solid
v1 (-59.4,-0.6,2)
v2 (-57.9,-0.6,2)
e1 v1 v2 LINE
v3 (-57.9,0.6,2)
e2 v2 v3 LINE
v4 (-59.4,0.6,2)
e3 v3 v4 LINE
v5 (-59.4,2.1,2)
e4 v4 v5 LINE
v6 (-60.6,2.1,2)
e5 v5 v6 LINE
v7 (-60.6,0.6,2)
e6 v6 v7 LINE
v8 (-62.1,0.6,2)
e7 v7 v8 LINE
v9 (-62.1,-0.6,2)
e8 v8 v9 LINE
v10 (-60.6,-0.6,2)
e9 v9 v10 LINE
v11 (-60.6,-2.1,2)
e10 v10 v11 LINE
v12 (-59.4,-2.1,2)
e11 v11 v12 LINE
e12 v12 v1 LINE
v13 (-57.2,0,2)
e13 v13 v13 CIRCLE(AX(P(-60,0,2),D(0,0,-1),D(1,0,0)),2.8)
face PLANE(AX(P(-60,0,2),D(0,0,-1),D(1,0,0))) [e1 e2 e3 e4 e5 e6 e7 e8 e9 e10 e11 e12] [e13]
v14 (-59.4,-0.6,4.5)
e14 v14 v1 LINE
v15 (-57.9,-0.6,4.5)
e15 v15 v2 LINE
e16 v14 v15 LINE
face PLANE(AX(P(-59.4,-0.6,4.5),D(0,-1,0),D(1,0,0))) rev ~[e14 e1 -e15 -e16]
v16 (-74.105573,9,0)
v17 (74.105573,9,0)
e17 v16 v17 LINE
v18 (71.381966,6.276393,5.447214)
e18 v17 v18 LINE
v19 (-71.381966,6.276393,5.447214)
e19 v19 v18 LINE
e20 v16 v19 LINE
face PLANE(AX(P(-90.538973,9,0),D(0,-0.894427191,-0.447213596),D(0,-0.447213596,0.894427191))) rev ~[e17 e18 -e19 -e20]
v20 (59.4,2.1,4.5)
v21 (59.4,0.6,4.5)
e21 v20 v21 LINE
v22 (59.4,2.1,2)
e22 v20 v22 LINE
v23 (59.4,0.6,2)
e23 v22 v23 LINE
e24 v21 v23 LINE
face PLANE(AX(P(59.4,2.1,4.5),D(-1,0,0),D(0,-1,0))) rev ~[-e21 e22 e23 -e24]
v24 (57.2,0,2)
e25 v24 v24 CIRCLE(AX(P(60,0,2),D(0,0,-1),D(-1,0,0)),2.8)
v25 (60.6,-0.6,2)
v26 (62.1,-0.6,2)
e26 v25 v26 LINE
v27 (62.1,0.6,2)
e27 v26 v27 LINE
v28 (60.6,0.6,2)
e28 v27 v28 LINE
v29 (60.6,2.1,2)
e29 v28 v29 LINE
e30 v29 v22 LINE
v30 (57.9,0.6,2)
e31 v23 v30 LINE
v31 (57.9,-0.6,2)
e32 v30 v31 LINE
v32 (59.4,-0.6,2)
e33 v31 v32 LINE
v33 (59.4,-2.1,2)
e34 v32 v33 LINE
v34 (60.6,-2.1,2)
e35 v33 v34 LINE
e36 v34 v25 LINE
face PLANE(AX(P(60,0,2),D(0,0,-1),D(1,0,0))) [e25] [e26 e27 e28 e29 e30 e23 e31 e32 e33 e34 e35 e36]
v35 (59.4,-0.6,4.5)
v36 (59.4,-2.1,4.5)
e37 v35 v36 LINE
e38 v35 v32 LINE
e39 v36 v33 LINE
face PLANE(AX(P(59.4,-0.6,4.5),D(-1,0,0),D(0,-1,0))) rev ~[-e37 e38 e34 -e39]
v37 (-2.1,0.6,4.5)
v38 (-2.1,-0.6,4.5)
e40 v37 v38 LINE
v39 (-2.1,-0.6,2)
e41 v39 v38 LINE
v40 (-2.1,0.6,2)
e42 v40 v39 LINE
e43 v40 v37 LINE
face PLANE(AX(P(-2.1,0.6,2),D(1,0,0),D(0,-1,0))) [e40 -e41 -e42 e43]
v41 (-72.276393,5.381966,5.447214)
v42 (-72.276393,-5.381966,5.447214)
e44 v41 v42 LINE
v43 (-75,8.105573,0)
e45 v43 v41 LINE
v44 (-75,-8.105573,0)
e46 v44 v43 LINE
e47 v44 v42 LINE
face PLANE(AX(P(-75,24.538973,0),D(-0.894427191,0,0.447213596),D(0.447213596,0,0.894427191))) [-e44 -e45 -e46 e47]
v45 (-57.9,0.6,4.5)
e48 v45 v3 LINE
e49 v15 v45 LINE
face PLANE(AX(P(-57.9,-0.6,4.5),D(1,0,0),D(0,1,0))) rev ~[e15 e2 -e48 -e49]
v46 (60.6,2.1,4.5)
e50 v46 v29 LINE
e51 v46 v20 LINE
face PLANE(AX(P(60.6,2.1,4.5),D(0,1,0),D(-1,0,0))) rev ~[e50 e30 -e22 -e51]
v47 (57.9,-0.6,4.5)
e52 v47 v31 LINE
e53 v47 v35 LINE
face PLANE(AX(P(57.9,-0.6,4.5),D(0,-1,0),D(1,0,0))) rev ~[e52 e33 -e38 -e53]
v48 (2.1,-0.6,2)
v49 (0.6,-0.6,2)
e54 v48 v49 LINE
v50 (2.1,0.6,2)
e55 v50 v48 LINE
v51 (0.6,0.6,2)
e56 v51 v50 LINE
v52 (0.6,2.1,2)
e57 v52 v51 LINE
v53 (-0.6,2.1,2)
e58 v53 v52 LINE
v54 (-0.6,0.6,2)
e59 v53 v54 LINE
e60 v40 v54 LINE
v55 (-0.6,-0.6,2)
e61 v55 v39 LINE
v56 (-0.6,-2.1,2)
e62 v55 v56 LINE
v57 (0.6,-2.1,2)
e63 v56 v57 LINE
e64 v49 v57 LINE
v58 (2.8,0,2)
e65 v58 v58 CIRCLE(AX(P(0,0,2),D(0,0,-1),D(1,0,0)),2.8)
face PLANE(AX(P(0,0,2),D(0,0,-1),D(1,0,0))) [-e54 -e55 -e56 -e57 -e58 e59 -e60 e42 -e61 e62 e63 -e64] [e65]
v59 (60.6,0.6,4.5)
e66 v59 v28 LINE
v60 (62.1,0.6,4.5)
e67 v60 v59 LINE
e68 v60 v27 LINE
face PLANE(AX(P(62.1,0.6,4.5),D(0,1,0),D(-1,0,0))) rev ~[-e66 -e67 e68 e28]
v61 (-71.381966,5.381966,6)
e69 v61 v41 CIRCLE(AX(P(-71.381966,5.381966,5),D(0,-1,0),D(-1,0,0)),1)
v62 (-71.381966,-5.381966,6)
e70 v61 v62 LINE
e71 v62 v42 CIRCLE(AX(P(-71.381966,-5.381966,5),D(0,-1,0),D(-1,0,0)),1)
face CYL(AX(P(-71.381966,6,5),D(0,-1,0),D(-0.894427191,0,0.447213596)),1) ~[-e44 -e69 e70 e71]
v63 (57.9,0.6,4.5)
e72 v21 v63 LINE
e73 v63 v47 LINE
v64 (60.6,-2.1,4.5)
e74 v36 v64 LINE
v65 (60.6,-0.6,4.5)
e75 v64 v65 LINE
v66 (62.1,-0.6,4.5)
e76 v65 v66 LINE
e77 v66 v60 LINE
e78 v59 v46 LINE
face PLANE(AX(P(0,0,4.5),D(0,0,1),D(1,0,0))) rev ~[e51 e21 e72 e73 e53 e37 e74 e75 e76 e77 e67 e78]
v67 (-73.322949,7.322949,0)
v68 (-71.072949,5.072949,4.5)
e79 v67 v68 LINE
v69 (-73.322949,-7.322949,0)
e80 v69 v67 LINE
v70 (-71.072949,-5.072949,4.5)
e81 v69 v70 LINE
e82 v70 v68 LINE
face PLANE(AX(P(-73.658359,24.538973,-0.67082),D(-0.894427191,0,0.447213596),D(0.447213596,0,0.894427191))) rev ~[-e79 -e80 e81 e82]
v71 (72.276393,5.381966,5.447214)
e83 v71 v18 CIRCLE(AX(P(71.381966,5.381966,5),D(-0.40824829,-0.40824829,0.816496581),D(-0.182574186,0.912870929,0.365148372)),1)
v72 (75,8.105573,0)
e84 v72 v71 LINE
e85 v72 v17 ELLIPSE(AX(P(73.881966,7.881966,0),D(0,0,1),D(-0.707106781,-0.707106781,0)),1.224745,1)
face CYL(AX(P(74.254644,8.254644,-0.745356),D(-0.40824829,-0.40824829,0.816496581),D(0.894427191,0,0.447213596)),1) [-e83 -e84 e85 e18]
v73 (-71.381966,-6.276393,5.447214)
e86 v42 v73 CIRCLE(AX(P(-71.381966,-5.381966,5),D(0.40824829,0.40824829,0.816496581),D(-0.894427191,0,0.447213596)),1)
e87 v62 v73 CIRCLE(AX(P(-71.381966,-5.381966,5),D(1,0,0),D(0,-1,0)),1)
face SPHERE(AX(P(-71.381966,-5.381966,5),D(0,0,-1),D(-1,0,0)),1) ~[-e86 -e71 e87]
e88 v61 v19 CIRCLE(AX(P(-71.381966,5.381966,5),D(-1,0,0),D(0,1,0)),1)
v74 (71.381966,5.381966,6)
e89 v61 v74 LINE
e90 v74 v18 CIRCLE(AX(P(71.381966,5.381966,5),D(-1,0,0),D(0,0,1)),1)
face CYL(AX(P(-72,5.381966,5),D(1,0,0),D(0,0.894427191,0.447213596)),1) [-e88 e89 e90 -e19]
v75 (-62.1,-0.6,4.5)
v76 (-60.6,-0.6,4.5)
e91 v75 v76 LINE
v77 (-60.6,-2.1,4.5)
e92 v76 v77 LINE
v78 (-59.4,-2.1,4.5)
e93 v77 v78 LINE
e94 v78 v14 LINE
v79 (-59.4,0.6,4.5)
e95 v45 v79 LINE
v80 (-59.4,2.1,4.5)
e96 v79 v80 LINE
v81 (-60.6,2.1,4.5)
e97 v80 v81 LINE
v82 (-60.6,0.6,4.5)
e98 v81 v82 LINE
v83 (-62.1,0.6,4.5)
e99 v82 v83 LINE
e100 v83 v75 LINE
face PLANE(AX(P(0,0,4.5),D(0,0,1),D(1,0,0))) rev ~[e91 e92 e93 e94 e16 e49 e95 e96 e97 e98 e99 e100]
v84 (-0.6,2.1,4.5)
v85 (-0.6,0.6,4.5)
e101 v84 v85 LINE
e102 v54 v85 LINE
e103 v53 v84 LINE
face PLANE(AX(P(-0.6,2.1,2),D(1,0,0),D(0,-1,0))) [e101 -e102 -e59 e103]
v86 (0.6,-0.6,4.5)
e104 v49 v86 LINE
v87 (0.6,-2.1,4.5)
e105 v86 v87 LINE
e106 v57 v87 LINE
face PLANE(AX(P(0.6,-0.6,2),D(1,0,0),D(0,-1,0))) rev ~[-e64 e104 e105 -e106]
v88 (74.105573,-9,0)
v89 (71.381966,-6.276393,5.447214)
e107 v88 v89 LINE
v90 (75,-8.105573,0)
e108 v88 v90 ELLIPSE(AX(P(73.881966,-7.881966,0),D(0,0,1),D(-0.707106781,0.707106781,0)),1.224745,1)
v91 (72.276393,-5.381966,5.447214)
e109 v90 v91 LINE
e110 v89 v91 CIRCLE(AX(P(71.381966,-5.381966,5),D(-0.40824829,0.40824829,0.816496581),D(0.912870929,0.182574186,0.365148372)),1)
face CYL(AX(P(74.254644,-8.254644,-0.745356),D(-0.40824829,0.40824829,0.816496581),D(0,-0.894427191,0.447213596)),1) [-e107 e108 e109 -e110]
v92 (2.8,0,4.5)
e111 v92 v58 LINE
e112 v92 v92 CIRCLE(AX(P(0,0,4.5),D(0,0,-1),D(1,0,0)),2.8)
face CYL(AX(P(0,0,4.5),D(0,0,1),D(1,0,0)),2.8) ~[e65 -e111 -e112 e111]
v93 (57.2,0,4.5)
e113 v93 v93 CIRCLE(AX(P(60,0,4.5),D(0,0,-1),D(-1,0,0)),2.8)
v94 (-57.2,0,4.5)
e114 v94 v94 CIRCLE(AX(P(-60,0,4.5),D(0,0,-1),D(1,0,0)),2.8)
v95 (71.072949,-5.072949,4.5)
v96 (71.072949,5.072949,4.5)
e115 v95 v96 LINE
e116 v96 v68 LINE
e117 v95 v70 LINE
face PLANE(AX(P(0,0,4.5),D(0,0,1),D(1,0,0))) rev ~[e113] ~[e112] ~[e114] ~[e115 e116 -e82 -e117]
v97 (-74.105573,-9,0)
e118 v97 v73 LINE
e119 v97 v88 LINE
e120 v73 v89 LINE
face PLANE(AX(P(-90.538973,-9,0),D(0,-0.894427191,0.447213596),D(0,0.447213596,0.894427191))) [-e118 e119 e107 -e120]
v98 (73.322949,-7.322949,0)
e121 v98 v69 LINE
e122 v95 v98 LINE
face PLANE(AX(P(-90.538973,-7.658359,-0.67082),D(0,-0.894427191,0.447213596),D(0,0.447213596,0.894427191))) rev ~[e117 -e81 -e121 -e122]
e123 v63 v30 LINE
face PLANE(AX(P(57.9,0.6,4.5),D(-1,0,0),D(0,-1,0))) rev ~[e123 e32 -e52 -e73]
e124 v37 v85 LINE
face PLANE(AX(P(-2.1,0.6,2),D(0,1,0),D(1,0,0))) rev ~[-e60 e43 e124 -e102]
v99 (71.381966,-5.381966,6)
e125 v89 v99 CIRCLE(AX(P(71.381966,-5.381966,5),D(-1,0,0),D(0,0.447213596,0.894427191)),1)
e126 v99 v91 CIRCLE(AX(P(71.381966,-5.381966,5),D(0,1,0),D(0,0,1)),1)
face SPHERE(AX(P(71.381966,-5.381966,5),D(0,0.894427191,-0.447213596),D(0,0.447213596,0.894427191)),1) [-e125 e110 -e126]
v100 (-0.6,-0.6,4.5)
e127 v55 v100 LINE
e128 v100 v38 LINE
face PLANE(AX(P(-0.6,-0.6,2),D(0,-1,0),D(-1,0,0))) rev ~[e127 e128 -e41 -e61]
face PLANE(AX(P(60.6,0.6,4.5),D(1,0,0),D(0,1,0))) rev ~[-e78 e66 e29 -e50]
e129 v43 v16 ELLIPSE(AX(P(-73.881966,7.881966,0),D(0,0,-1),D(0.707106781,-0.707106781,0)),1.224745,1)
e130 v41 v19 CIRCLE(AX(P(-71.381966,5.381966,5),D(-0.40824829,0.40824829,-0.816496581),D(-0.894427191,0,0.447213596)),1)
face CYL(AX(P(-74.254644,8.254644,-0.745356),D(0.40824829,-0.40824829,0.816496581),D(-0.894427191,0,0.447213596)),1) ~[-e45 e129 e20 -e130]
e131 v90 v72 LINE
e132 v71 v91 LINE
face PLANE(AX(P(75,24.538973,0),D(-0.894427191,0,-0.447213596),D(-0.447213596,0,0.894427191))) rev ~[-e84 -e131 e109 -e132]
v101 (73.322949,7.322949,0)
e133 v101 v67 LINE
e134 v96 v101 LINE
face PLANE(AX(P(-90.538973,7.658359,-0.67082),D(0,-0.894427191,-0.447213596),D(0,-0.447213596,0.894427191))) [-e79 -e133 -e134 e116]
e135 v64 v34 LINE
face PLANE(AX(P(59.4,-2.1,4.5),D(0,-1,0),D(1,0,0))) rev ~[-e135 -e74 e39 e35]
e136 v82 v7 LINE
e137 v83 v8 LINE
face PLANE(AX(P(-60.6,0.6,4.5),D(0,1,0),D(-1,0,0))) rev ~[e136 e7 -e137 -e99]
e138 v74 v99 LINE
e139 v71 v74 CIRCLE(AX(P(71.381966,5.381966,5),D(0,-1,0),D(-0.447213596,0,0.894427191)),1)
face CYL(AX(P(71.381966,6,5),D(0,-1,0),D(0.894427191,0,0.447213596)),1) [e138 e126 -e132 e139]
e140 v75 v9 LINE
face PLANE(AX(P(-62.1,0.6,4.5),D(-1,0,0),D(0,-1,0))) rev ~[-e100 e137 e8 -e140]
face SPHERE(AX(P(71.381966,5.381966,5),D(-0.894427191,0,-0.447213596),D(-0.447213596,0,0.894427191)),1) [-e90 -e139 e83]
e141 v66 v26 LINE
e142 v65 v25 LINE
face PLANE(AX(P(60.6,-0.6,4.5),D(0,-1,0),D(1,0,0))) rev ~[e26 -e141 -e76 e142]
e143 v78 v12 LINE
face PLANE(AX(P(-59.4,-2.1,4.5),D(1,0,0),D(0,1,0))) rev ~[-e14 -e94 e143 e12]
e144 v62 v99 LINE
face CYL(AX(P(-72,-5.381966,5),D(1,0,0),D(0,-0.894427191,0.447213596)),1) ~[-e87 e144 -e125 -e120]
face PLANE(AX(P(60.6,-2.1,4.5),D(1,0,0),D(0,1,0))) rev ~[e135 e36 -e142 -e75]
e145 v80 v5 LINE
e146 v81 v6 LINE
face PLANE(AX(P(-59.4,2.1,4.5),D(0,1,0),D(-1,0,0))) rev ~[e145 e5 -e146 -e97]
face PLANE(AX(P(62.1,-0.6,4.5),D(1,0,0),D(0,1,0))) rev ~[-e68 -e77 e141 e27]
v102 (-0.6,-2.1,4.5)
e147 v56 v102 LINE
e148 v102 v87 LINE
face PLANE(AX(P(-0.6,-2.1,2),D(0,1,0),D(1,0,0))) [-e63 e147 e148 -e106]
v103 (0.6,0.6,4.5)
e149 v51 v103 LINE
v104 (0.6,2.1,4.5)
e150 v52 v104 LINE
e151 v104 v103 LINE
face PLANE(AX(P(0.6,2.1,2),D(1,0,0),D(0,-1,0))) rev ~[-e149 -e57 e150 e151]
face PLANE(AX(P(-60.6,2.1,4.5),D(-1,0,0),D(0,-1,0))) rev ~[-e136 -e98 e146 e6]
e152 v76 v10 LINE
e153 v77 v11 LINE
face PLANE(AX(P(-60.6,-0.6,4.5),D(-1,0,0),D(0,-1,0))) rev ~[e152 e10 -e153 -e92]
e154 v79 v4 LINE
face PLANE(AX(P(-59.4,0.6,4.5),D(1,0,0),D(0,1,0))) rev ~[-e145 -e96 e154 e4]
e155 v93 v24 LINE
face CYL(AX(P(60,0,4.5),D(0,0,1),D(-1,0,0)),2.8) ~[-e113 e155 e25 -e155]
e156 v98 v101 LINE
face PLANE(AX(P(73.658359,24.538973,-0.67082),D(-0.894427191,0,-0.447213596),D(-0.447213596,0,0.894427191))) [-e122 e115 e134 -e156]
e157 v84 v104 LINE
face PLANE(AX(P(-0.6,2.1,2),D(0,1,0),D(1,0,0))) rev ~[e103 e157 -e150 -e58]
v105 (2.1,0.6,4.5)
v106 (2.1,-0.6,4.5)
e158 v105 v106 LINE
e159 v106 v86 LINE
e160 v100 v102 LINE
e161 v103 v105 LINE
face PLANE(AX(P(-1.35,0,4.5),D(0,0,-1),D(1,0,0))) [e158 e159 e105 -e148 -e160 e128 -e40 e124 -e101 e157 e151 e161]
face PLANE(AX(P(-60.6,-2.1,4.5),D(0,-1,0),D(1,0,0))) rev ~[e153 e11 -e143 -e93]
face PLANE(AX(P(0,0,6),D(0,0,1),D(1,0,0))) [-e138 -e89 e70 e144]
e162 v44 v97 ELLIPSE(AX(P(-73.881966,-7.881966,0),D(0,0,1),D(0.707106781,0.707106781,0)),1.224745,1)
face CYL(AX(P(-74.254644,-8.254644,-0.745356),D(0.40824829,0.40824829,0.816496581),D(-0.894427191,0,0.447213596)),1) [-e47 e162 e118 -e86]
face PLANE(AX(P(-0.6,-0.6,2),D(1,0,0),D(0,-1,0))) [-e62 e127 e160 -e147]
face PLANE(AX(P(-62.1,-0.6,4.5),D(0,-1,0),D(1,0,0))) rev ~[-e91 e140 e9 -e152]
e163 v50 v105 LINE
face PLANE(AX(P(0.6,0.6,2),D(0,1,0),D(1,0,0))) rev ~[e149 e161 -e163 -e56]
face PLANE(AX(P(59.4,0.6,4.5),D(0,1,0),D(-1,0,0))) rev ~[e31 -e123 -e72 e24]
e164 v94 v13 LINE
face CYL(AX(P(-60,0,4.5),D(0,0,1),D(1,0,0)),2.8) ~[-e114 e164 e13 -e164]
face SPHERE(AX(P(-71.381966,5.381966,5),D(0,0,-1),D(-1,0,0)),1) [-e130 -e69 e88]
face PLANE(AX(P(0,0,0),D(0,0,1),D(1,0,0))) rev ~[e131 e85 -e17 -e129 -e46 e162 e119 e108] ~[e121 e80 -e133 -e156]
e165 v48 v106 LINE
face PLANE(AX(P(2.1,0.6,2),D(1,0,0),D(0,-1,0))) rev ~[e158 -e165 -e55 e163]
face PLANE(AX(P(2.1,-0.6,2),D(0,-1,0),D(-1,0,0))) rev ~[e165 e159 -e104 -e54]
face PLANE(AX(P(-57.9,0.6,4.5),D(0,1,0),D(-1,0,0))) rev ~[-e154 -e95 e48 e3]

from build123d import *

# Parameters (mm, degrees)
F0_W        = 150
F0_H        = 18
F1_DEPTH    = 6
F2_T1_DEPTH = 49.0779464854
F2_T3_DEPTH = 181.0779464854
F3_R        = 1
F4_T        = -1.5
F5_R        = 2.8
F6_DEPTH    = 2.5
F7_W        = 1.5
F7_H        = 1.2
F7_W_2      = 1.2
F7_H_2      = 1.5
F8_DEPTH    = 2.5
F9_R        = 2.8
F10_DEPTH   = 2.5


# Not quite as in the source:
# - a fillet or chamfer that OpenCascade refuses, or shapes differently, is made with other operations: its cross-section is extruded or revolved along the edge and cut away or added


with BuildPart() as f1:
    # F0 (on Top) → F1 (new body)
    with BuildSketch(Plane.XY):
        Rectangle(F0_W, F0_H)
    extrude(amount=F1_DEPTH)

    # F2: chamfer of 3 x 6 on 4 edges, made by hand

    # F2_s2 → F2_t1 (cut)
    with BuildSketch(Plane.XZ.offset(-24.5389732427)):
        Polygon((75, 0), (72, 6), (75, 6), align=None)
        Polygon((-75, 0), (-72, 6), (-75, 6), align=None)
    extrude(amount=F2_T1_DEPTH, mode=Mode.SUBTRACT)

    # F2_s4 → F2_t3 (cut)
    with BuildSketch(Plane.YZ.offset(-90.5389732427)):
        Polygon((9, 0), (6, 6), (9, 6), align=None)
        Polygon((-9, 0), (-6, 6), (-9, 6), align=None)
    extrude(amount=F2_T3_DEPTH, mode=Mode.SUBTRACT)

    # F3
    f3_edges = [f1.edges().sort_by_distance(p)[0] for p in [
        (-73.5, 7.5, 3),
        (-73.5, -7.5, 3),
        (-72, 0, 6),
        (0, 6, 6),
        (72, 0, 6),
        (0, -6, 6),
        (73.5, 7.5, 3),
        (73.5, -7.5, 3),
    ]]
    fillet(f3_edges, radius=F3_R)

    # F4
    f4_openings = [f1.faces().sort_by_distance(p)[0] for p in [
        (0, 0, 0),
    ]]
    offset(amount=F4_T, openings=f4_openings)

    # F5 (on face) → F6 (join)
    with BuildSketch(Plane(origin=(0, 0, 4.5), x_dir=(1, 0, 0), z_dir=(0, 0, -1))):
        Circle(F5_R)
    extrude(amount=F6_DEPTH)

    # F7 (on face) → F8 (cut)
    with BuildSketch(Plane(origin=(0, 0, 2), x_dir=(1, 0, 0), z_dir=(0, 0, -1))):
        with Locations((-1.35, 0)):
            Rectangle(F7_W, F7_H)
        Rectangle(F7_W_2, F7_H)
        with Locations((0, -1.35)):
            Rectangle(F7_W_2, F7_H_2)
        with Locations((1.35, 0)):
            Rectangle(F7_W, F7_H)
        with Locations((0, 1.35)):
            Rectangle(F7_W_2, F7_H_2)
    extrude(amount=-F8_DEPTH, mode=Mode.SUBTRACT)

    # F9 (on face) → F10 (join)
    with BuildSketch(Plane(origin=(0, 0, 4.5), x_dir=(1, 0, 0), z_dir=(0, 0, -1))):
        with BuildLine():
            ThreePointArc((62.8, 0), (60, 2.8), (57.2, 0))
            ThreePointArc((57.2, 0), (60, -2.8), (62.8, 0))
        make_face()
        Polygon((57.9, -0.6), (57.9, 0), (57.9, 0.6), (59.4, 0.6), (59.4, 2.1), (60.6, 2.1), (60.6, 0.6), (62.1, 0.6), (62.1, -0.6), (60.6, -0.6), (60.6, -2.1), (59.4, -2.1), (59.4, -0.6), align=None, mode=Mode.SUBTRACT)
        with Locations((-60, 0)):
            Circle(F9_R)
        Polygon((-59.4, -0.6), (-59.4, -2.1), (-60.6, -2.1), (-60.6, -0.6), (-62.1, -0.6), (-62.1, 0.6), (-60.6, 0.6), (-60.6, 2.1), (-59.4, 2.1), (-59.4, 0.6), (-57.9, 0.6), (-57.9, -0.6), align=None, mode=Mode.SUBTRACT)
    extrude(amount=F10_DEPTH)


solid = f1.part
